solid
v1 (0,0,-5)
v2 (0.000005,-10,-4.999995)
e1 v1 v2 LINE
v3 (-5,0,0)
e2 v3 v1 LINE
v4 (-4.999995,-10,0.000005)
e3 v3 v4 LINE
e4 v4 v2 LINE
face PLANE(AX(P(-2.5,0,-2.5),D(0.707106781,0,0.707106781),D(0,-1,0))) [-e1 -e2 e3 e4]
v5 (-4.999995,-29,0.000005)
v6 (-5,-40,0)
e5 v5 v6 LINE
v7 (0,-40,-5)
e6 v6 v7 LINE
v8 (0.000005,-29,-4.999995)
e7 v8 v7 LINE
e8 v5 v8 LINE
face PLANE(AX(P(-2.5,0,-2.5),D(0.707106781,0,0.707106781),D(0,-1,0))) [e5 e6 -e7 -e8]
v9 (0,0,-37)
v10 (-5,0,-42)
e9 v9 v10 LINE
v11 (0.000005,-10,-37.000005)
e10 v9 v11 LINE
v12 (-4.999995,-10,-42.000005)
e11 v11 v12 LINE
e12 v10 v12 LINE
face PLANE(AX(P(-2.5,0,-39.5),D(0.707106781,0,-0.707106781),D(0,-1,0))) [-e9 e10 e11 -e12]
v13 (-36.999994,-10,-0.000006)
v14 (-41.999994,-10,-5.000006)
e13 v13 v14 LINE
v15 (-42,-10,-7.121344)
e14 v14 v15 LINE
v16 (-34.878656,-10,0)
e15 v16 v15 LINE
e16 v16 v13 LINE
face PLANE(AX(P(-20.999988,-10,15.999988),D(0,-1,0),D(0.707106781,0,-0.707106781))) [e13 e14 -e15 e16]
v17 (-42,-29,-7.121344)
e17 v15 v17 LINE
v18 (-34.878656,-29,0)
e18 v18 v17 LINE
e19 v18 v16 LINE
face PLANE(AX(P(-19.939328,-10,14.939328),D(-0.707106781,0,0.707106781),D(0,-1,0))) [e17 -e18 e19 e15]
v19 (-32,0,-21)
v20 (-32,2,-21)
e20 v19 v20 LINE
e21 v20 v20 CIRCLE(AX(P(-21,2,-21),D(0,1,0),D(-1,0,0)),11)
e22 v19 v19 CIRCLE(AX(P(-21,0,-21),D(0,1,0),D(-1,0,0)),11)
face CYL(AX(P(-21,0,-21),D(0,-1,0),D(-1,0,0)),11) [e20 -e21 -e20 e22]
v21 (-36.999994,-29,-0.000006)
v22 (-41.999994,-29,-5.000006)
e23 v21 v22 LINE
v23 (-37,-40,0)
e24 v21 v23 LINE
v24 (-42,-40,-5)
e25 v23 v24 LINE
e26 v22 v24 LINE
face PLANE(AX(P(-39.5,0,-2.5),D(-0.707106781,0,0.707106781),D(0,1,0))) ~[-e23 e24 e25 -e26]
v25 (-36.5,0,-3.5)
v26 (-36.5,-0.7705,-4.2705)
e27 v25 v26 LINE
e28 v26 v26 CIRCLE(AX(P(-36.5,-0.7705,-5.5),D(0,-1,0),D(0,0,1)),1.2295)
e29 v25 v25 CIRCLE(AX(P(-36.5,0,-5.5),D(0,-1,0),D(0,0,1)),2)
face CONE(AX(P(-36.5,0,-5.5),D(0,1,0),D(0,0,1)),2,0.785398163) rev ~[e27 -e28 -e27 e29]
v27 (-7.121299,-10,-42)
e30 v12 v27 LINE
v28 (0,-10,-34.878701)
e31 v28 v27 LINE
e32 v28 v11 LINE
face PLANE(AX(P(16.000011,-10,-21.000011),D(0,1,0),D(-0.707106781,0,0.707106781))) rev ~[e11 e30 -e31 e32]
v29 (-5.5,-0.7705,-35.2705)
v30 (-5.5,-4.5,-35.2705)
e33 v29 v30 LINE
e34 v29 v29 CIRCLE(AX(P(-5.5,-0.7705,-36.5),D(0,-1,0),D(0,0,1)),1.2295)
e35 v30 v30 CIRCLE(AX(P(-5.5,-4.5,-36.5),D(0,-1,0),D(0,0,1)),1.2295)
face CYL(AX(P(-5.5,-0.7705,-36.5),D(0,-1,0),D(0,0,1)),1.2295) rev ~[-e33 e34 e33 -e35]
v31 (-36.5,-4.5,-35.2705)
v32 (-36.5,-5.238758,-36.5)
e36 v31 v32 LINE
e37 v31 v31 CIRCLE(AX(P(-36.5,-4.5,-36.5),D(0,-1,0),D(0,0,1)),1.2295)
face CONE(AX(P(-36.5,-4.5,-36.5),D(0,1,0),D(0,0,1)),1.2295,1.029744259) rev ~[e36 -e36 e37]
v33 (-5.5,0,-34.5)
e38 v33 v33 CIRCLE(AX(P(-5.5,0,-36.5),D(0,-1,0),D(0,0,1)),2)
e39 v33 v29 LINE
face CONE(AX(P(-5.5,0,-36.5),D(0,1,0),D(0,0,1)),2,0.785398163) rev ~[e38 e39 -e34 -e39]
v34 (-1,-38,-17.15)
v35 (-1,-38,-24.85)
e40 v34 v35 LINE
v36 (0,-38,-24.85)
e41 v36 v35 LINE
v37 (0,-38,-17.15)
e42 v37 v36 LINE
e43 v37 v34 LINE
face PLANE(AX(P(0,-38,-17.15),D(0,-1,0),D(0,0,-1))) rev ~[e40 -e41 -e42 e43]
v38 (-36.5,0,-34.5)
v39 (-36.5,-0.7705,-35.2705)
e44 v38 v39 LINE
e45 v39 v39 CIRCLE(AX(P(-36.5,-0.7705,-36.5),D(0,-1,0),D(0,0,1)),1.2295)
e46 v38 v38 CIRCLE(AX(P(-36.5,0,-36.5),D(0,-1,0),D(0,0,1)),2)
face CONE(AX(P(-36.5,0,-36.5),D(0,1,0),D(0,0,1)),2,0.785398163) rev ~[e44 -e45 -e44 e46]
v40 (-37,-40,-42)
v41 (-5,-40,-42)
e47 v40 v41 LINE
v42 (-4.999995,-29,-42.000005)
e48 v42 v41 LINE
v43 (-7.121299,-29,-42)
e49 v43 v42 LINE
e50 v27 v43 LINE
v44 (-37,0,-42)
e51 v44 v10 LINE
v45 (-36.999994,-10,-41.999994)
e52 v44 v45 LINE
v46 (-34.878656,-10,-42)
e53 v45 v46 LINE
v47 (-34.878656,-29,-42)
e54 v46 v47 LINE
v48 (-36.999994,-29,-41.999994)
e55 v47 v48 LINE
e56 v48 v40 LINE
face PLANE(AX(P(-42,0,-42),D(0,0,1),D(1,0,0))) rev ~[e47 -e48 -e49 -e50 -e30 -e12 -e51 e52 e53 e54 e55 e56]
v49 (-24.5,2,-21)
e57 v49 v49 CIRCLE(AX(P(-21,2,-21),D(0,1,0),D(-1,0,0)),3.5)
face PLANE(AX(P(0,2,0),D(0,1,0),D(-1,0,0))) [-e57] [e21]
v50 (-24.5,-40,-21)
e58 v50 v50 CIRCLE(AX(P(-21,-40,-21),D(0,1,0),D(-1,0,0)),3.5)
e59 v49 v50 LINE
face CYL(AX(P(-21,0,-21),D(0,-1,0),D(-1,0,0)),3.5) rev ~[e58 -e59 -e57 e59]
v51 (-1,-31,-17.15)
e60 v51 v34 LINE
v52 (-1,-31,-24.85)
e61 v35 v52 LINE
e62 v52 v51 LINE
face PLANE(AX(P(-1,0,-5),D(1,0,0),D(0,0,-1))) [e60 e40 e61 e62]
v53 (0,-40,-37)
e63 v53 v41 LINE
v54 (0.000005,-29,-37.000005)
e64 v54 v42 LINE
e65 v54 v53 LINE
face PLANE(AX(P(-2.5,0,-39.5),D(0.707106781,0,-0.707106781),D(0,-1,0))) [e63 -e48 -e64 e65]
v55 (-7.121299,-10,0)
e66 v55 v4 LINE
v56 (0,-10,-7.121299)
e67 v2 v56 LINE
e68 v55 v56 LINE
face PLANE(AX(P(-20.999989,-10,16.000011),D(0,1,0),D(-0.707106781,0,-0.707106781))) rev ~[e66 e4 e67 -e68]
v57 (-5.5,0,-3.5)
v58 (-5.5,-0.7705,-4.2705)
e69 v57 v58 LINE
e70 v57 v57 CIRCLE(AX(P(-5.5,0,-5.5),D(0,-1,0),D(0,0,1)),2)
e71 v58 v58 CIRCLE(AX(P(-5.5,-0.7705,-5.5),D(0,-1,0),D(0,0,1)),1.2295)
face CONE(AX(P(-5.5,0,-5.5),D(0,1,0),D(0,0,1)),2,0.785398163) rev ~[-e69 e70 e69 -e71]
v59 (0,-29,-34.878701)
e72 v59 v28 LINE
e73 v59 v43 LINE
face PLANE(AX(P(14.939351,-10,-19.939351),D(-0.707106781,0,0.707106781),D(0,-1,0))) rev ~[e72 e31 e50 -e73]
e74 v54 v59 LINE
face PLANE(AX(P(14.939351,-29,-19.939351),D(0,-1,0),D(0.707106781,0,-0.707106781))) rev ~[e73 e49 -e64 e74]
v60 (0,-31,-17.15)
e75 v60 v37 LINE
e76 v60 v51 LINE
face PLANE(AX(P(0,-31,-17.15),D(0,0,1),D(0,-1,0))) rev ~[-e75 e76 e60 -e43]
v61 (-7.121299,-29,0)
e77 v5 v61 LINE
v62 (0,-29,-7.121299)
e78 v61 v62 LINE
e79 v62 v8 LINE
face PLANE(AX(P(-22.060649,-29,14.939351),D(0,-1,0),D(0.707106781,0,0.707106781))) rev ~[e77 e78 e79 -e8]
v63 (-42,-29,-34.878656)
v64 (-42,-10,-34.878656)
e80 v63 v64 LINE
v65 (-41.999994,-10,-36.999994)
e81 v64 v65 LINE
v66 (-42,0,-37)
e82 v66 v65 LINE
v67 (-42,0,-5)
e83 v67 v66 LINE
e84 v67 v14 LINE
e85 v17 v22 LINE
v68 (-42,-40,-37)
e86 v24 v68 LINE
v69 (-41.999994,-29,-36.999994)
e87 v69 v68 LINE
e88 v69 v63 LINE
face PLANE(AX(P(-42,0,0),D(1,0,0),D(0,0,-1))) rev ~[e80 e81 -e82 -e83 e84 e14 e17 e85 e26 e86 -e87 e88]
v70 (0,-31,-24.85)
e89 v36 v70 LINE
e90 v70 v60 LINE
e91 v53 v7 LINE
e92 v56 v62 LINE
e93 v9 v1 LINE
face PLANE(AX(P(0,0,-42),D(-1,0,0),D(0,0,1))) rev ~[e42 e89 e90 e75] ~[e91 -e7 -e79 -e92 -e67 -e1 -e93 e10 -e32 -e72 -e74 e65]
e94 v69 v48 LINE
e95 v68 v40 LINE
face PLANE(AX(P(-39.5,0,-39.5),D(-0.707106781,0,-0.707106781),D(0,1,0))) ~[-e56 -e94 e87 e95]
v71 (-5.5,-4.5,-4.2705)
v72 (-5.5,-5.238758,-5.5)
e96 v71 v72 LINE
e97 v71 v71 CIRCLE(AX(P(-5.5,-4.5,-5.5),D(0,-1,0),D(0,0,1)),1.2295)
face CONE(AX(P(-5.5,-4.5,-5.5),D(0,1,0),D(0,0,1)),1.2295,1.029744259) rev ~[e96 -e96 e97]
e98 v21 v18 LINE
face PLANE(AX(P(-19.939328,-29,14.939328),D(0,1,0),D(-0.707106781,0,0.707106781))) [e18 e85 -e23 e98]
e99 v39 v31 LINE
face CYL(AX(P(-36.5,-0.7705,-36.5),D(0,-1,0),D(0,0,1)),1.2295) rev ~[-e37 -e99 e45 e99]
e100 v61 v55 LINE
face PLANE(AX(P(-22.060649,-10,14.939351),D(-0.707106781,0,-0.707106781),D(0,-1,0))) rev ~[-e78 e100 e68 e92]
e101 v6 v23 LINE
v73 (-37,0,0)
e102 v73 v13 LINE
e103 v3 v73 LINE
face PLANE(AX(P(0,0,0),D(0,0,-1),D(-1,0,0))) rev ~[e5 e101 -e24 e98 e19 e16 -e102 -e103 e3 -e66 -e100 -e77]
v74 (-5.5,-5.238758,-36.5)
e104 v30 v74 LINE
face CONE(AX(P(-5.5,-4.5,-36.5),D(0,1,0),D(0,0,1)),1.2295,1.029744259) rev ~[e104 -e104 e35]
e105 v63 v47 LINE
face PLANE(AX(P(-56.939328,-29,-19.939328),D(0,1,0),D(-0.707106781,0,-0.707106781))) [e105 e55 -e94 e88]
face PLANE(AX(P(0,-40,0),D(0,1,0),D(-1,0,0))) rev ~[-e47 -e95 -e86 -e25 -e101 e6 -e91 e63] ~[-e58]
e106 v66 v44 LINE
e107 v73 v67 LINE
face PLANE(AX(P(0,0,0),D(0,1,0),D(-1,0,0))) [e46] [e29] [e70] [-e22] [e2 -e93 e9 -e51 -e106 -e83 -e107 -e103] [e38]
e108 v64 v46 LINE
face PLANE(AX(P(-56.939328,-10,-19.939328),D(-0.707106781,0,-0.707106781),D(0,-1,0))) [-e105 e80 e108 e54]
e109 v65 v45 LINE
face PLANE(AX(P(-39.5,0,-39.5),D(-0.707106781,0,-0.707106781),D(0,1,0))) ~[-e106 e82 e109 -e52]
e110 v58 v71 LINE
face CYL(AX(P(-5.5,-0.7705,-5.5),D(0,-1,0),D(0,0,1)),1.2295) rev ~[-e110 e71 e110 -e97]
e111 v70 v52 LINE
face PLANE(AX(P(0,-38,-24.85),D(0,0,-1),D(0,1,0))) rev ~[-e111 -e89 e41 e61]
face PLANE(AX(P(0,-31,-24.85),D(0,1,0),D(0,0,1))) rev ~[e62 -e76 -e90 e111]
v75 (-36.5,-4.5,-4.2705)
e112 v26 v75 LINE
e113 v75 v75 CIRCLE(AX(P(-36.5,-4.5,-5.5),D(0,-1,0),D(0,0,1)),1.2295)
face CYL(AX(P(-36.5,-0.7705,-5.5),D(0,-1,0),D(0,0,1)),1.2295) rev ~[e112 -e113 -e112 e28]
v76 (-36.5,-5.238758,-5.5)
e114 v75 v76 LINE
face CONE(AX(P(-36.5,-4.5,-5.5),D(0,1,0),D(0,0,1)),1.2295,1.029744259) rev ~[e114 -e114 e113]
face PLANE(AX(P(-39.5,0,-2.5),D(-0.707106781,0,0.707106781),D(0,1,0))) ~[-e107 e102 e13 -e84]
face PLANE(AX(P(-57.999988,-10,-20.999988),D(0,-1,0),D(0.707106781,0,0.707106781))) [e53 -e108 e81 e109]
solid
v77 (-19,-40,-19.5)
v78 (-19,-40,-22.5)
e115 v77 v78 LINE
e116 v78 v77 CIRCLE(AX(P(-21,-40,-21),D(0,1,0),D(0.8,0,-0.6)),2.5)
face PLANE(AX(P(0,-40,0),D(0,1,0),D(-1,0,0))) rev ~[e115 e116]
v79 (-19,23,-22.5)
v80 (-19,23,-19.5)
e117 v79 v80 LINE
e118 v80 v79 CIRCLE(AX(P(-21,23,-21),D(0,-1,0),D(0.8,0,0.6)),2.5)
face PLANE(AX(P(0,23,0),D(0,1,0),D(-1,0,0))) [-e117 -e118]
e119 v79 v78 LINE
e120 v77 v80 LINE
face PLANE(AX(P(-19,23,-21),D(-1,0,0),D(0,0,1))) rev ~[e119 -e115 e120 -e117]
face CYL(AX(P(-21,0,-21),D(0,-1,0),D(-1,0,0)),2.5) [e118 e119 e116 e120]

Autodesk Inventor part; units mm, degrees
ref_plane "YZ Plane" through (0, 0, 0) normal (1, 0, 0) x (0, 1, 0)
sketch "Sketch2" plane through (0, 0, 0) normal (0, 1, 0) x (-1, 0, 0)
  line L0 (0, 0) -> (42, 0)
  line L1 (42, 0) -> (42, -42)
  line L2 (42, -42) -> (0, -42)
  line L3 (0, -42) -> (0, 0)
  circle A0 centre (21, -21) radius 11
  circle A1 centre (21, -21) radius 3.5
  circle A2 centre (21, -21) radius 2.5
  point P0 (5.5, -5.5)
  point P1 (5.5, -36.5)
  point P2 (36.5, -36.5)
  point P3 (36.5, -5.5)
  dimension "d15" = 42
  dimension "d16" = 42
  dimension "d17" = 22
  dimension "d18" = 7
  dimension "d19" = 5
extrude "Extrusion3" add sketch "Sketch2" against normal blind 40 contours L0 L1 L2 L3 | A0
extrude "Extrusion4" add sketch "Sketch2" along normal blind 2 contours A0
hole "Hole1" at (-36.5, 0, -5.5) at (-36.5, 0, -36.5) at (-5.5, 0, -36.5) at (-5.5, 0, -5.5) direction (0, -1, 0) diameter 2.459 depth 4.5 tip angle 118 countersink diameter 4 countersink angle 90 thread size "M3x0.5" class "6H" standard "ANSI Metric M Profile"
chamfer "Chamfer1" distance 5 angle 45 4 edges at (-42, -20, 0) (0, -20, 0) (-42, -20, -42) (0, -20, -42)
ref_plane "Work Plane1" through (-5, 0, 0) normal (0.7071068, 0, 0.7071068) x (0.7071068, 0, -0.7071068)
sketch "Sketch3" plane through (-5, 0, 0) normal (0.7071068, 0, 0.7071068) x (0.7071068, 0, -0.7071068)
  line L0 (0, 0) -> (0, -40) projected
  line L1 (-22.6274, 0) -> (0, 0) projected
  line L2 (-22.6274, -40) -> (-22.6274, 0) projected
  line L3 (0, -40) -> (-22.6274, -40) projected
  line L4 (29.6985, 0) -> (29.6985, -40) projected
  line L5 (7.0711, 0) -> (29.6985, 0) projected
  line L6 (7.0711, -40) -> (7.0711, 0) projected
  line L7 (29.6985, -40) -> (7.0711, -40) projected
  line L8 (29.6985, -40) -> (29.6985, 0) projected
  line L9 (29.6985, -10) -> (28.1985, -10)
  line L10 (28.1985, -10) -> (28.1985, -29)
  line L11 (28.1985, -29) -> (29.6985, -29)
  line L12 (29.6985, -29) -> (29.6985, -10)
  line L13 (-22.6274, 0) -> (-22.6274, -40) projected
  line L14 (-22.6274, -10) -> (-21.1274, -10)
  line L15 (-21.1274, -10) -> (-21.1274, -29)
  line L16 (-21.1274, -29) -> (-22.6274, -29)
  line L17 (-22.6274, -29) -> (-22.6274, -10)
  point P0 (3.5355, 0)
  dimension "d36" = 1.5
  dimension "d50" = 1.5
extrude "Extrusion5" cut sketch "Sketch3" against normal through all contours L14 L15 L16 L2 | L4 L11 L10 L9
ref_plane "Work Plane2" through (-42, 0, -5) normal (-0.7071068, 0, 0.7071068) x (0.7071068, 0, 0.7071068)
sketch "Sketch4" plane through (-42, 0, -5) normal (-0.7071068, 0, 0.7071068) x (0.7071068, 0, 0.7071068)
  line L0 (-22.6274, -40) -> (-22.6274, 0) projected
  line L1 (0, -40) -> (-22.6274, -40) projected
  line L2 (0, 0) -> (0, -10) projected
  line L3 (-22.6274, 0) -> (0, 0) projected
  line L4 (29.6985, 0) -> (29.6985, -40) projected
  line L5 (7.0711, 0) -> (29.6985, 0) projected
  line L6 (7.0711, -40) -> (7.0711, -29) projected
  line L7 (29.6985, -40) -> (7.0711, -40) projected
  line L8 (-22.6274, -10) -> (-21.1274, -10)
  line L9 (-21.1274, -10) -> (-21.1274, -29)
  line L10 (-21.1274, -29) -> (-22.6274, -29)
  line L11 (-22.6274, -29) -> (-22.6274, -10)
  line L12 (29.6985, -40) -> (29.6985, 0) projected
  line L13 (29.6985, -10) -> (28.1985, -10)
  line L14 (28.1985, -10) -> (28.1985, -29)
  line L15 (28.1985, -29) -> (29.6985, -29)
  line L16 (29.6985, -29) -> (29.6985, -10)
  line L17 (0, -29) -> (-1.5, -29) projected
  line L18 (-1.5, -29) -> (-1.5, -10) projected
  line L19 (-1.5, -10) -> (0, -10) projected
  line L20 (0, -29) -> (0, -40) projected
  line L21 (7.0711, -10) -> (8.5711, -10) projected
  line L22 (8.5711, -10) -> (8.5711, -29) projected
  line L23 (8.5711, -29) -> (7.0711, -29) projected
  line L24 (7.0711, -10) -> (7.0711, 0) projected
  point P0 (33.234, 0)
  point P1 (29.6985, -10)
  dimension "d39" = 1.5
  dimension "d40" = 1.5
extrude "Extrusion6" cut sketch "Sketch4" against normal through all contours L0 L8 L9 L10 | L4 L15 L14 L13
extrude "Extrusion7" add sketch "Sketch2" against normal up to surface (40 mm away) contours A2
extrude "Extrusion8" add sketch "Sketch2" along normal blind 23 contours A2
sketch "Sketch5" plane through (-21, 23, -21) normal (0, 1, 0) x (1, 0, 0)
  circle A0 centre (0, 0) radius 2.5 projected
  circle A1 centre (0, 0) radius 2.5 projected
  line L0 (-2.5, 0) -> (2, 0)
  line L1 (2, 1.5) -> (2, -1.5)
  point P0 (21, -21)
  point P1 (2, -1.5)
  point P2 (2, 1.5)
  dimension "d47" = 4.5
extrude "Extrusion9" cut sketch "Sketch5" against normal through all contours A0 L1
sketch "Sketch6" plane through (0, 0, -5) normal (1, 0, 0) x (0, 0, -1)
  line L0 (12.15, -38) -> (19.85, -38)
  line L1 (19.85, -38) -> (19.85, -31)
  line L2 (19.85, -31) -> (12.15, -31)
  line L3 (12.15, -31) -> (12.15, -38)
  point P0 (-5, 0)
  dimension "d51" = 7.7
  dimension "d52" = 7
extrude "Extrusion10" cut sketch "Sketch6" against normal blind 1
properties part number "motor"
